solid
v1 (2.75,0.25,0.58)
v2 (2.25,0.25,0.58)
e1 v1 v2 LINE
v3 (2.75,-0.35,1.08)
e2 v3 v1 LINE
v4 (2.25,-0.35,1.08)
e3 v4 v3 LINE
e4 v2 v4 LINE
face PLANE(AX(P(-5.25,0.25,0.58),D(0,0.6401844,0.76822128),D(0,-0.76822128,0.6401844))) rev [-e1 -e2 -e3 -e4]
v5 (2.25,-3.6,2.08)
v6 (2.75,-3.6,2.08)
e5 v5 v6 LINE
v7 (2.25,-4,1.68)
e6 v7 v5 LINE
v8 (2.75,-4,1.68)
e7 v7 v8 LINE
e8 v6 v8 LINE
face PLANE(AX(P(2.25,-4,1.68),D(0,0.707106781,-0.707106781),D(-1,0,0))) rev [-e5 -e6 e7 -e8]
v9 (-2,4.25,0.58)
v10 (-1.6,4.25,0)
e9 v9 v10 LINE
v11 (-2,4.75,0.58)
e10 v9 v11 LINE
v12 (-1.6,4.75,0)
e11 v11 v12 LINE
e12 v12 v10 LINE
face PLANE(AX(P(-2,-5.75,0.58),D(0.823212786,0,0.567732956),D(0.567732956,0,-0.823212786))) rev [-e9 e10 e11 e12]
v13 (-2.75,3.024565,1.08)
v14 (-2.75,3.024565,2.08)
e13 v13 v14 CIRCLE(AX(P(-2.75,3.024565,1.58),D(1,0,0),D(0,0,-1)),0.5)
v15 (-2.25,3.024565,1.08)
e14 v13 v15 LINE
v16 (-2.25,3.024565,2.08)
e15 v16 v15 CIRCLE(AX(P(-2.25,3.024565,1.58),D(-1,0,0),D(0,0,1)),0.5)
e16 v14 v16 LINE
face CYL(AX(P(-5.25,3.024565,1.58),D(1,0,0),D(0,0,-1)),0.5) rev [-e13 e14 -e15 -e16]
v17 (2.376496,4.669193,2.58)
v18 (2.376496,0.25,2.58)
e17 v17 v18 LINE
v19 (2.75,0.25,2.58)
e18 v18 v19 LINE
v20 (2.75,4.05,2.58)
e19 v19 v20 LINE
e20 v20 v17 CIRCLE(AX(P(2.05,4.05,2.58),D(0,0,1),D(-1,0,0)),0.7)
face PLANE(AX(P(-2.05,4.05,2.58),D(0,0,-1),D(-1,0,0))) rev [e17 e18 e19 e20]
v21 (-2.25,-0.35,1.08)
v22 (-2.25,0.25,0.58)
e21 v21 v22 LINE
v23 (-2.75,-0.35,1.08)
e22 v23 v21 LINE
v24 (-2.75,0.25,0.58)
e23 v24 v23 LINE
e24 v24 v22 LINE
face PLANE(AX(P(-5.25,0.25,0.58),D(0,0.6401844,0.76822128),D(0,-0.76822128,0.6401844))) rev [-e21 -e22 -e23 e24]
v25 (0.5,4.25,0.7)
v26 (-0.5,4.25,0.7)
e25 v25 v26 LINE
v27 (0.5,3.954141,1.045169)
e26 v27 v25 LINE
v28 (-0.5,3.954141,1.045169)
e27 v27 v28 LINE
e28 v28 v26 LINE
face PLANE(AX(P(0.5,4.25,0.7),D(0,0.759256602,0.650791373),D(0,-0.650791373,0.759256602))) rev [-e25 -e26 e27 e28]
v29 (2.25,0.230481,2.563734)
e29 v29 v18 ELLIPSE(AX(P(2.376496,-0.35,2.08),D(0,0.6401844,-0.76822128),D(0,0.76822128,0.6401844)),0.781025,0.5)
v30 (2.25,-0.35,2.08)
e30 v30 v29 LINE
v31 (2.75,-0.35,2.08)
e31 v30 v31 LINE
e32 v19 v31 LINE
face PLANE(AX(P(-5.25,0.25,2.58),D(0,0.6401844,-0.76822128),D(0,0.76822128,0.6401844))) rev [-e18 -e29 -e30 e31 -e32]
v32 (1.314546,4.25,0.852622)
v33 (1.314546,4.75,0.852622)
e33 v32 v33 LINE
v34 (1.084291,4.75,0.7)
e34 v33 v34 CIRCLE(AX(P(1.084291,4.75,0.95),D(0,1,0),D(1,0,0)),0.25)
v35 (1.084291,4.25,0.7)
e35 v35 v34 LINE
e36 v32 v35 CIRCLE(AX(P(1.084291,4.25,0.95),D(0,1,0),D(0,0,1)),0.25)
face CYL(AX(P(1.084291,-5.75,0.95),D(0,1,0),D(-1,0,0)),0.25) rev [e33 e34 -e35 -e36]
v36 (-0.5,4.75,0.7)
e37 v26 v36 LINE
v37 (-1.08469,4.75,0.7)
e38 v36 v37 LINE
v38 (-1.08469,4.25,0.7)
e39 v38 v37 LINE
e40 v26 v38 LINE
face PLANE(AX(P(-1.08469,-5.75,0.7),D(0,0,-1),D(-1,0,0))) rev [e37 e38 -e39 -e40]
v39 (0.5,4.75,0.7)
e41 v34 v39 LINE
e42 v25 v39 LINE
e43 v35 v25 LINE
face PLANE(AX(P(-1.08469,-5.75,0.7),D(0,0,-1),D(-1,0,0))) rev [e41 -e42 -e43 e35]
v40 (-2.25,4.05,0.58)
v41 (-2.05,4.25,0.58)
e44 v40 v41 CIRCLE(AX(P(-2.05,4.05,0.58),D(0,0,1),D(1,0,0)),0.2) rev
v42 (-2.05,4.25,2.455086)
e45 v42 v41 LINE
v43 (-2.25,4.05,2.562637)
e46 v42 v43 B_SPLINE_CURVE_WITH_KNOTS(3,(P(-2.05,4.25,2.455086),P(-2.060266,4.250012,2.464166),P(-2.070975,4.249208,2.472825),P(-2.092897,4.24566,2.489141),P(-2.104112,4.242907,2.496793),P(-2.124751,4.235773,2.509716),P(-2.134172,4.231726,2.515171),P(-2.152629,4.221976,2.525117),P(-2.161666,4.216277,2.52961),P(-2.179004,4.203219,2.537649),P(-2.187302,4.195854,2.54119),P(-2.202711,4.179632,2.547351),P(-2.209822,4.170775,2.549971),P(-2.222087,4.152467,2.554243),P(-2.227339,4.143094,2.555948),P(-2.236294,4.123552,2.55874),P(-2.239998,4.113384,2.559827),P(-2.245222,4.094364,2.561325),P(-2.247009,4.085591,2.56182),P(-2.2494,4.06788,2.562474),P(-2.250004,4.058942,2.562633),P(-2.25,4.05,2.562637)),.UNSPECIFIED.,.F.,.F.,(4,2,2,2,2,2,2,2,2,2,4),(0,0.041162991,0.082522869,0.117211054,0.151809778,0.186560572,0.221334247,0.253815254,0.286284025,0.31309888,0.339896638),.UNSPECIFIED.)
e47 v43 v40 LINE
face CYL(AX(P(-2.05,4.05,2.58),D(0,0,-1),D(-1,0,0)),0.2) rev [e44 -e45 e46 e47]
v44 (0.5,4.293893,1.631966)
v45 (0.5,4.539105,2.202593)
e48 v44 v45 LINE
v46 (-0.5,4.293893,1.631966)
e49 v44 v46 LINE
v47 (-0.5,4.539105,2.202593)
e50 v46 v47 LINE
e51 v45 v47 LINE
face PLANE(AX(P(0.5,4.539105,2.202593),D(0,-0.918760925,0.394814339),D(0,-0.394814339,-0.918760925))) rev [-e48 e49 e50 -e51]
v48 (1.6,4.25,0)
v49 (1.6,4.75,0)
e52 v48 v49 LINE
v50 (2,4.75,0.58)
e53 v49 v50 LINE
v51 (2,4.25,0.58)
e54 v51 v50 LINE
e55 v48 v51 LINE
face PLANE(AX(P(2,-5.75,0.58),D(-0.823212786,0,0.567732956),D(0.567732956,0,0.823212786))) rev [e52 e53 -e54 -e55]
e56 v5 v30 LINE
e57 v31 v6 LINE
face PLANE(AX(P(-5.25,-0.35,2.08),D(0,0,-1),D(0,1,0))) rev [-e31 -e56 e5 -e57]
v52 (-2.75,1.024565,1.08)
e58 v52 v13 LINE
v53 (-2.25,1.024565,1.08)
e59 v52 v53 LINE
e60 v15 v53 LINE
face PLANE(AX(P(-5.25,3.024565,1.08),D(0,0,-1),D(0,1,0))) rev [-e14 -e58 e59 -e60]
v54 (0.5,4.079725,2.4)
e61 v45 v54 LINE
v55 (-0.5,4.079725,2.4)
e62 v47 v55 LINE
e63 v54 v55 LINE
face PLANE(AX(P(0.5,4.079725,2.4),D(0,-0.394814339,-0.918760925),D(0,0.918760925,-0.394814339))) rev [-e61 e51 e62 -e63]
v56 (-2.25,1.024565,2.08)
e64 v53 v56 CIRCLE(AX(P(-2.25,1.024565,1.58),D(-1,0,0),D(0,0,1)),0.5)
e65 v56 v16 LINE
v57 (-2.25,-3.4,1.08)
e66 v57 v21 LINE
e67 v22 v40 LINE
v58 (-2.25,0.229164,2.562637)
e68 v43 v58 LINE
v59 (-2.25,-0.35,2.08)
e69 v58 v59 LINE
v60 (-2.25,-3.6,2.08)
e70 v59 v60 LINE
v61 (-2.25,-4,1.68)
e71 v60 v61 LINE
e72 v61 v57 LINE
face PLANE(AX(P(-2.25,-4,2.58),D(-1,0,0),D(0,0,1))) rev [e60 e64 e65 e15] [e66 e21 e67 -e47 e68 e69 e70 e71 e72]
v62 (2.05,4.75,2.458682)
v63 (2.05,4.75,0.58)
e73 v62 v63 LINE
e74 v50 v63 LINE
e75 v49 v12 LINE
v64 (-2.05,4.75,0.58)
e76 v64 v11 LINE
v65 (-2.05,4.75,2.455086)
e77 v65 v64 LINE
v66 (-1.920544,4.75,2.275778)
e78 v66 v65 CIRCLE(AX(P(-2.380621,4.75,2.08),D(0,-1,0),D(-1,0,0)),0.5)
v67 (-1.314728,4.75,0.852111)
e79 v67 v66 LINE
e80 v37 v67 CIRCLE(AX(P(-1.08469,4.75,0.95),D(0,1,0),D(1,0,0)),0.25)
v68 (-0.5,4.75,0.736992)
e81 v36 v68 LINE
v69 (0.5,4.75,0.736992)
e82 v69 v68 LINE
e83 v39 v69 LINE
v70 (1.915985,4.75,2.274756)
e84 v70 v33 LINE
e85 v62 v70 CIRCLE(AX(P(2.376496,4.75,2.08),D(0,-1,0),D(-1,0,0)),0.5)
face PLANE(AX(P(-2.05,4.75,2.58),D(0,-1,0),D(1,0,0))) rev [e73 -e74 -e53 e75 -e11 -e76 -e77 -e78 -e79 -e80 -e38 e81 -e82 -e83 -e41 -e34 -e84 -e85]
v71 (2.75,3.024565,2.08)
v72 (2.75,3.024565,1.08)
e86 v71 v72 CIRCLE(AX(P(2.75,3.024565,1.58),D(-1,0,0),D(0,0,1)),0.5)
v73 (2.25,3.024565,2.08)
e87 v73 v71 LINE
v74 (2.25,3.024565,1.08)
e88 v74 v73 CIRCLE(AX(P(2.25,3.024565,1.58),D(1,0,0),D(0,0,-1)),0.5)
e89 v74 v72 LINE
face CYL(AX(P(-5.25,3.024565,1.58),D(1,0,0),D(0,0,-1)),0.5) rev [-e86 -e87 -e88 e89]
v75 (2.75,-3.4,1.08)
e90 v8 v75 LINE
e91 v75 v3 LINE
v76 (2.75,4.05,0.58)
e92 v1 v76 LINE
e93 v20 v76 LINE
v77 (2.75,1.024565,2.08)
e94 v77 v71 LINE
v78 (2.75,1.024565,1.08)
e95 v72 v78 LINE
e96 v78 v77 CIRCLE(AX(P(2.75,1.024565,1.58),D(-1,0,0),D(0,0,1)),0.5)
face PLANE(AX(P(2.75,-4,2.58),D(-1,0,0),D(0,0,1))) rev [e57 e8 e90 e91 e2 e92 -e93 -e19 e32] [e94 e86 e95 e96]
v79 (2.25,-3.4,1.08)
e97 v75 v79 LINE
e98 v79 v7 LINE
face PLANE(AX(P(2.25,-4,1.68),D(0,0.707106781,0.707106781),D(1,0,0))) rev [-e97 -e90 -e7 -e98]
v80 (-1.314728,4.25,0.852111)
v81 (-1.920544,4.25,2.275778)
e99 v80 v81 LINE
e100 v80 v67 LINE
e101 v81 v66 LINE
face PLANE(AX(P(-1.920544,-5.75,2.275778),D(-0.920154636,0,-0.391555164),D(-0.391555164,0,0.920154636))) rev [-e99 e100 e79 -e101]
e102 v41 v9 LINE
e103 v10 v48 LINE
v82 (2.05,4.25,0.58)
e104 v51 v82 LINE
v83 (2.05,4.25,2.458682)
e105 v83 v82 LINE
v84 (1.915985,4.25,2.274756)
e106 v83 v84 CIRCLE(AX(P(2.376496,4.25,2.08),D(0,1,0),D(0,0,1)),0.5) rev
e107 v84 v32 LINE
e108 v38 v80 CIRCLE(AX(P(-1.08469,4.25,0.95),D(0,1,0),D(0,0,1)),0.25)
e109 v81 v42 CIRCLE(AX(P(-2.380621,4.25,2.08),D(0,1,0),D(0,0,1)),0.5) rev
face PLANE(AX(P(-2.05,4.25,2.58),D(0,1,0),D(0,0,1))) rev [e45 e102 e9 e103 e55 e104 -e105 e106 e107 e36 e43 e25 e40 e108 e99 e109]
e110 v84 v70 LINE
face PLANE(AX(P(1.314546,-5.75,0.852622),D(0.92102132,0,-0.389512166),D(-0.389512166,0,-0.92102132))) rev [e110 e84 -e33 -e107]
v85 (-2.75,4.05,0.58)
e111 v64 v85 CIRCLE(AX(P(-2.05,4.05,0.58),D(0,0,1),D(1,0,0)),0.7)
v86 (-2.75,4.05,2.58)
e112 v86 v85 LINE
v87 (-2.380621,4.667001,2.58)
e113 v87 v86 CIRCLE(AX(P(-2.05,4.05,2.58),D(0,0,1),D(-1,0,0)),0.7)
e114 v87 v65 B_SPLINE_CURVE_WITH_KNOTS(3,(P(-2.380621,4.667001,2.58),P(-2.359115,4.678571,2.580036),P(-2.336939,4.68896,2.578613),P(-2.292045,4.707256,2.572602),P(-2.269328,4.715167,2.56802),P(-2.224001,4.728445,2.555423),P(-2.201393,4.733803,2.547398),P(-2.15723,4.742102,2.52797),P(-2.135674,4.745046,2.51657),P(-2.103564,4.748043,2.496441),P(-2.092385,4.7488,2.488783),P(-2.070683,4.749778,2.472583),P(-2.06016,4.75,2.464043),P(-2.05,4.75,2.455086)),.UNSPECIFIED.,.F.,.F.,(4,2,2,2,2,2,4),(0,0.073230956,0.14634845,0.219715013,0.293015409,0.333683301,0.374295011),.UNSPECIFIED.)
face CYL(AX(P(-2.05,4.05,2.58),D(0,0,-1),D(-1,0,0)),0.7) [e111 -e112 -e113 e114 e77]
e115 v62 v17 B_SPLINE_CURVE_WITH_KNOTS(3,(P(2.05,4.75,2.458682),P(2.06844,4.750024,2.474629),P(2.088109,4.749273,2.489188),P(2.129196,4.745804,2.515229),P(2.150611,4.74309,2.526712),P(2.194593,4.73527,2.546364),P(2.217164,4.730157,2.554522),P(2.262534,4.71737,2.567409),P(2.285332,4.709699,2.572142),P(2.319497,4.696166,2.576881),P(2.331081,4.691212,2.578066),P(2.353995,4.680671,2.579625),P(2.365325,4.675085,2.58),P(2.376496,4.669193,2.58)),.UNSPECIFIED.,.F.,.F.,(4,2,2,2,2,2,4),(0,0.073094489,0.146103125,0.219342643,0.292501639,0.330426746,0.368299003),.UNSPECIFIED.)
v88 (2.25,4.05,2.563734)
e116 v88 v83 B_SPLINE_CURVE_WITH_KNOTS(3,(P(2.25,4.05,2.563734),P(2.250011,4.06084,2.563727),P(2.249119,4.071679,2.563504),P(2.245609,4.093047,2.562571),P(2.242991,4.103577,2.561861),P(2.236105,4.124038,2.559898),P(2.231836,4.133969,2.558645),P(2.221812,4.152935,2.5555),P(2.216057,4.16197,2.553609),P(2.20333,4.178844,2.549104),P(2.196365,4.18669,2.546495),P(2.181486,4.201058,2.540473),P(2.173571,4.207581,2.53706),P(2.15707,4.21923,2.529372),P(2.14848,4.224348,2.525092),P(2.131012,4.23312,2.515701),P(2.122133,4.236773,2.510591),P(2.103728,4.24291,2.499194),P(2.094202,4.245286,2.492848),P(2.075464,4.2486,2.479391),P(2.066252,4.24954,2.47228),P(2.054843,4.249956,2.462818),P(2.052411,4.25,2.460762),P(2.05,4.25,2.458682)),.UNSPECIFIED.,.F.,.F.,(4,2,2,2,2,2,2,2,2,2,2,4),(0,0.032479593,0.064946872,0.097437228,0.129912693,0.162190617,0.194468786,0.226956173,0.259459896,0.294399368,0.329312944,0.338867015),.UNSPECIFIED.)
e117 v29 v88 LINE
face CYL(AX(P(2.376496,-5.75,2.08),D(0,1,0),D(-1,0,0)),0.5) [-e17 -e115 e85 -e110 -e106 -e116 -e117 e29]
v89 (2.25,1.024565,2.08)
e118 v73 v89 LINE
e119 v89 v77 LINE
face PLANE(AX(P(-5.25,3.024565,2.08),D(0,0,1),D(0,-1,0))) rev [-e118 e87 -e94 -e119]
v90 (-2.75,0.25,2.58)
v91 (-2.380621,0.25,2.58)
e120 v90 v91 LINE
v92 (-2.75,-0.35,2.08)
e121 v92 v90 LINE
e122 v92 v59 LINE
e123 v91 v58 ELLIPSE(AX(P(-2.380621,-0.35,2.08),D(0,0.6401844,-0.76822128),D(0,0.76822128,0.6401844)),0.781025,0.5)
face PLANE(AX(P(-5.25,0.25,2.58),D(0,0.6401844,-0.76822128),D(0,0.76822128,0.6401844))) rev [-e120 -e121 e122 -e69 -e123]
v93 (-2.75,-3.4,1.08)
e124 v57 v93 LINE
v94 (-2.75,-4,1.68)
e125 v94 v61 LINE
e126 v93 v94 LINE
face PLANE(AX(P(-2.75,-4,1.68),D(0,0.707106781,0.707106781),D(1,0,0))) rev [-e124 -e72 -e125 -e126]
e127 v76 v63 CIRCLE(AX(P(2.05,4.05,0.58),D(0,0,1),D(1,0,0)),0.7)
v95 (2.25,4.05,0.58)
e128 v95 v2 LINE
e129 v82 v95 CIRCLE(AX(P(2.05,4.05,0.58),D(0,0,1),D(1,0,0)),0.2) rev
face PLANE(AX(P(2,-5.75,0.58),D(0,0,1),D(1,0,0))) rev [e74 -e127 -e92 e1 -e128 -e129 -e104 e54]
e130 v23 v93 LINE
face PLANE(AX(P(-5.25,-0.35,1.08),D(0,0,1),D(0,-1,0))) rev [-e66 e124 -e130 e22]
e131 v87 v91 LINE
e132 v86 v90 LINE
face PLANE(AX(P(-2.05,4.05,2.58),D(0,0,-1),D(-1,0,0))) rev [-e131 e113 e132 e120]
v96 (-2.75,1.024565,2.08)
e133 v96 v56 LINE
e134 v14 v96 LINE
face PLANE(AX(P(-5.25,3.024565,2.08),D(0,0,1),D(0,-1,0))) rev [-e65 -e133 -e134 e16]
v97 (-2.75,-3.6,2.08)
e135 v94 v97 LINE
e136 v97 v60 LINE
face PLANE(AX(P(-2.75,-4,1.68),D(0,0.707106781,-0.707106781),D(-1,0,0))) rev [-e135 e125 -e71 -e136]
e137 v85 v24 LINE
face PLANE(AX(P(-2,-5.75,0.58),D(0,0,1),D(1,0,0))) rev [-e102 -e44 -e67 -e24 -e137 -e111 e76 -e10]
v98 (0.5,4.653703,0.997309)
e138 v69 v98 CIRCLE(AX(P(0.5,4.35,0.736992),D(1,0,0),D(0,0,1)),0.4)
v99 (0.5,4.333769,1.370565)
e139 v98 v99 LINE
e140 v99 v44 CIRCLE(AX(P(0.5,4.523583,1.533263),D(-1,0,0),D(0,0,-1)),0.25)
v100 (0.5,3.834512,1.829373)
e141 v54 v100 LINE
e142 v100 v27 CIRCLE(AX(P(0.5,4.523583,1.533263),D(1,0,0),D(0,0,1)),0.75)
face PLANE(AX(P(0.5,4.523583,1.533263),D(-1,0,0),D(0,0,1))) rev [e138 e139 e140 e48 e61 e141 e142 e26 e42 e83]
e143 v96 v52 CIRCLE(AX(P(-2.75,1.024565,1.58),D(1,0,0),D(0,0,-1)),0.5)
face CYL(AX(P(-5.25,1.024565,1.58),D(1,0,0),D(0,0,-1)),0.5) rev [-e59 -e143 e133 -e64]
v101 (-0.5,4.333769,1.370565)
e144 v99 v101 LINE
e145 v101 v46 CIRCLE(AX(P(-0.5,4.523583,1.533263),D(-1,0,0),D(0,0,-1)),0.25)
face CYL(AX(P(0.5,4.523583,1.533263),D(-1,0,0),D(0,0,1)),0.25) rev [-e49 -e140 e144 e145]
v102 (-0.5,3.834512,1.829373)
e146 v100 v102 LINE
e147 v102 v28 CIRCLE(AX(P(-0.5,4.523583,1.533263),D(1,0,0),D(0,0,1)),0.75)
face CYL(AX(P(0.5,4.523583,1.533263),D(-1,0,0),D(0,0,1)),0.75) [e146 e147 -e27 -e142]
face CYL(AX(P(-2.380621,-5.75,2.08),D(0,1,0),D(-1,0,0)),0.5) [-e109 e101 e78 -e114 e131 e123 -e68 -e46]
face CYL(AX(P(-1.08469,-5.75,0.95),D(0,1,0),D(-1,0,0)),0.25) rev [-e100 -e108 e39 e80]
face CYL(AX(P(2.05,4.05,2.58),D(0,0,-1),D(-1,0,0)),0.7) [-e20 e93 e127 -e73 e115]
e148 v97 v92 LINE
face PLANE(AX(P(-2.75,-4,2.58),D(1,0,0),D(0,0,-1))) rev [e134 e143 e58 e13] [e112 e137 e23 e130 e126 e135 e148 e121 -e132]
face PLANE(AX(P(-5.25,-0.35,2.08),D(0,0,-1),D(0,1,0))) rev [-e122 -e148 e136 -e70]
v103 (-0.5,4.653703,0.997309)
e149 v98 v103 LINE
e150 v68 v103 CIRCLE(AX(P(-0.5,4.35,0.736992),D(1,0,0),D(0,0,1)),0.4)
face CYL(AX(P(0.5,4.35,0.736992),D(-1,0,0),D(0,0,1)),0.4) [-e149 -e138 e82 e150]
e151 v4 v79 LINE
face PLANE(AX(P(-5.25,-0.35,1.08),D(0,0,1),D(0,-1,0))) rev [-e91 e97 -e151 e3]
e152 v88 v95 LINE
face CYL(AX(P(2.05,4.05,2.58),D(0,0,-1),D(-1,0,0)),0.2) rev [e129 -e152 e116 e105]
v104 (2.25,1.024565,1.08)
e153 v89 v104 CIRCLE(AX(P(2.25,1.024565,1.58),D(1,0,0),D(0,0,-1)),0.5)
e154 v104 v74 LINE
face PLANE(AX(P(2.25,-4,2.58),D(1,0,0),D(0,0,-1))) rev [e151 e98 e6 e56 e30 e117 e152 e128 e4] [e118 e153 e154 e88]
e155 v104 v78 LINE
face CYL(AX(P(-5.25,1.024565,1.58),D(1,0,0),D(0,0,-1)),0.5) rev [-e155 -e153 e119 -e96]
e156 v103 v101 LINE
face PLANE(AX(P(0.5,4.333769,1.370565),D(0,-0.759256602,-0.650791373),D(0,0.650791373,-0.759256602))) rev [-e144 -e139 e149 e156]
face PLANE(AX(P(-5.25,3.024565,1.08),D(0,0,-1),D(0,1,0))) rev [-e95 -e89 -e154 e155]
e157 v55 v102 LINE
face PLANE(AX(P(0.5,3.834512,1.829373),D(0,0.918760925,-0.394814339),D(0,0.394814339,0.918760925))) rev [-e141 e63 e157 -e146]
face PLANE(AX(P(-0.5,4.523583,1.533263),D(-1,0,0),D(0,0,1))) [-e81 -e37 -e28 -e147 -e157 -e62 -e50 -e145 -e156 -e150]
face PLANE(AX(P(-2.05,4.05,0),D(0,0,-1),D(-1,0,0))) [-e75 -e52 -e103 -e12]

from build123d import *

# Parameters (mm, degrees)
BOSS_EXTRUDE1_DEPTH = 2.58
CUT_EXTRUDE1_DEPTH  = 10.5
CUT_EXTRUDE2_DEPTH  = 5.25
BOSS_EXTRUDE2_DEPTH = 0.5
CHAMFER1_SIZE       = 0.6
CHAMFER2_SIZE       = 0.4


with BuildPart() as part:
    # Sketch1 → Boss-Extrude1 (new body)
    with BuildSketch(Plane.XY):
        with BuildLine():
            Line((-2.75, -4), (-2.75, 4.05))
            ThreePointArc((-2.75, 4.05), (-2.544974747, 4.544974747), (-2.05, 4.75))
            Line((-2.05, 4.75), (2.05, 4.75))
            ThreePointArc((2.05, 4.75), (2.544974747, 4.544974747), (2.75, 4.05))
            Line((2.75, 4.05), (2.75, -4))
            Line((2.75, -4), (2.25, -4))
            Line((2.25, -4), (2.25, 4.05))
            ThreePointArc((2.25, 4.05), (2.191421356, 4.191421356), (2.05, 4.25))
            Line((2.05, 4.25), (-2.05, 4.25))
            ThreePointArc((-2.05, 4.25), (-2.191421356, 4.191421356), (-2.25, 4.05))
            Line((-2.25, 4.05), (-2.25, -4))
            Line((-2.25, -4), (-2.75, -4))
        make_face()
    extrude(amount=BOSS_EXTRUDE1_DEPTH)

    # Sketch2 → Cut-Extrude1 (cut)
    with BuildSketch(Plane(origin=(0, 4.75, 0), x_dir=(1, 0, 0), z_dir=(0, 1, 0))):
        Polygon((-2, -0.58), (-4.099439411, -0.58), (-4.099439411, 0.833357165), (-2, 0.833357165), (-1.6, 0), align=None)
        Polygon((2, -0.58), (3.357409655, -0.58), (3.357409655, 0.833357165), (2, 0.833357165), (1.6, 0), align=None)
        with BuildLine():
            Line((-2.75, -2.58), (-2.38062097, -2.58))
            ThreePointArc((-2.38062097, -2.58), (-2.104839164, -2.497066416), (-1.920543652, -2.275777582))
            Line((-1.920543652, -2.275777582), (-1.314728174, -0.852111209))
            ThreePointArc((-1.314728174, -0.852111209), (-1.222580418, -0.741466792), (-1.084689515, -0.7))
            Line((-1.084689515, -0.7), (1.084290526, -0.7))
            ThreePointArc((1.084290526, -0.7), (1.222412736, -0.741619926), (1.314545856, -0.852621958))
            Line((1.314545856, -0.852621958), (1.915985292, -2.274756083))
            ThreePointArc((1.915985292, -2.274756083), (2.100251533, -2.496760148), (2.376495952, -2.58))
            Line((2.376495952, -2.58), (2.75, -2.58))
            Line((2.75, -2.58), (2.75, -3.056093585))
            Line((2.75, -3.056093585), (-2.75, -3.056093585))
            Line((-2.75, -3.056093585), (-2.75, -2.58))
        make_face()
    extrude(amount=-CUT_EXTRUDE1_DEPTH, mode=Mode.SUBTRACT)

    # Sketch3 → Cut-Extrude2 (cut, symmetric)
    with BuildSketch(Plane(origin=(0, 0, 0), x_dir=(0, 0, -1), z_dir=(1, 0, 0))):
        Polygon((-0.58, 0.25), (-1.08, -0.35), (-1.08, -4.396314828), (-0.130305992, -4.396314828), (-0.130305992, 0.25), align=None)
        Polygon((-2.58, 0.25), (-2.08, -0.35), (-2.08, -4.896314828), (-3.070294312, -4.896314828), (-3.070294312, 0.25), align=None)
        with BuildLine():
            Line((-1.08, 3.024565065), (-1.08, 1.024565065))
            ThreePointArc((-1.08, 1.024565065), (-1.58, 0.524565065), (-2.08, 1.024565065))
            Line((-2.08, 1.024565065), (-2.08, 3.024565065))
            ThreePointArc((-2.08, 3.024565065), (-1.58, 3.524565065), (-1.08, 3.024565065))
        make_face()
    extrude(amount=CUT_EXTRUDE2_DEPTH, both=True, mode=Mode.SUBTRACT)

    # Sketch4 → Boss-Extrude2 (add, symmetric)
    with BuildSketch(Plane(origin=(0, 0, 0), x_dir=(0, 0, -1), z_dir=(1, 0, 0))):
        with BuildLine():
            Line((-0.7, 4.25), (-1.045169213, 3.954140675))
            ThreePointArc((-1.045169213, 3.954140675), (-1.420160684, 3.782160221), (-1.829373497, 3.834512432))
            Line((-1.829373497, 3.834512432), (-2.4, 4.079724782))
            Line((-2.4, 4.079724782), (-2.202592831, 4.539105245))
            Line((-2.202592831, 4.539105245), (-1.631966328, 4.293892895))
            ThreePointArc((-1.631966328, 4.293892895), (-1.495562057, 4.276442158), (-1.3705649, 4.333768976))
            Line((-1.3705649, 4.333768976), (-0.997308957, 4.653702641))
            ThreePointArc((-0.997308957, 4.653702641), (-0.875770907, 4.725154006), (-0.736992408, 4.75))
            Line((-0.736992408, 4.75), (-0.7, 4.75))
            Line((-0.7, 4.75), (-0.7, 4.25))
        make_face()
    extrude(amount=BOSS_EXTRUDE2_DEPTH, both=True)

    # Chamfer1
    chamfer1_edges = [part.edges().sort_by_distance(p)[0] for p in [
        (2.5, -4, 1.08),
        (-2.5, -4, 1.08),
    ]]
    chamfer(chamfer1_edges, length=CHAMFER1_SIZE)

    # Chamfer2
    chamfer2_edges = [part.edges().sort_by_distance(p)[0] for p in [
        (-2.5, -4, 2.08),
        (2.5, -4, 2.08),
    ]]
    chamfer(chamfer2_edges, length=CHAMFER2_SIZE - 0.0001)  # a hair under: the kernel refuses the full size


solid = part.part
